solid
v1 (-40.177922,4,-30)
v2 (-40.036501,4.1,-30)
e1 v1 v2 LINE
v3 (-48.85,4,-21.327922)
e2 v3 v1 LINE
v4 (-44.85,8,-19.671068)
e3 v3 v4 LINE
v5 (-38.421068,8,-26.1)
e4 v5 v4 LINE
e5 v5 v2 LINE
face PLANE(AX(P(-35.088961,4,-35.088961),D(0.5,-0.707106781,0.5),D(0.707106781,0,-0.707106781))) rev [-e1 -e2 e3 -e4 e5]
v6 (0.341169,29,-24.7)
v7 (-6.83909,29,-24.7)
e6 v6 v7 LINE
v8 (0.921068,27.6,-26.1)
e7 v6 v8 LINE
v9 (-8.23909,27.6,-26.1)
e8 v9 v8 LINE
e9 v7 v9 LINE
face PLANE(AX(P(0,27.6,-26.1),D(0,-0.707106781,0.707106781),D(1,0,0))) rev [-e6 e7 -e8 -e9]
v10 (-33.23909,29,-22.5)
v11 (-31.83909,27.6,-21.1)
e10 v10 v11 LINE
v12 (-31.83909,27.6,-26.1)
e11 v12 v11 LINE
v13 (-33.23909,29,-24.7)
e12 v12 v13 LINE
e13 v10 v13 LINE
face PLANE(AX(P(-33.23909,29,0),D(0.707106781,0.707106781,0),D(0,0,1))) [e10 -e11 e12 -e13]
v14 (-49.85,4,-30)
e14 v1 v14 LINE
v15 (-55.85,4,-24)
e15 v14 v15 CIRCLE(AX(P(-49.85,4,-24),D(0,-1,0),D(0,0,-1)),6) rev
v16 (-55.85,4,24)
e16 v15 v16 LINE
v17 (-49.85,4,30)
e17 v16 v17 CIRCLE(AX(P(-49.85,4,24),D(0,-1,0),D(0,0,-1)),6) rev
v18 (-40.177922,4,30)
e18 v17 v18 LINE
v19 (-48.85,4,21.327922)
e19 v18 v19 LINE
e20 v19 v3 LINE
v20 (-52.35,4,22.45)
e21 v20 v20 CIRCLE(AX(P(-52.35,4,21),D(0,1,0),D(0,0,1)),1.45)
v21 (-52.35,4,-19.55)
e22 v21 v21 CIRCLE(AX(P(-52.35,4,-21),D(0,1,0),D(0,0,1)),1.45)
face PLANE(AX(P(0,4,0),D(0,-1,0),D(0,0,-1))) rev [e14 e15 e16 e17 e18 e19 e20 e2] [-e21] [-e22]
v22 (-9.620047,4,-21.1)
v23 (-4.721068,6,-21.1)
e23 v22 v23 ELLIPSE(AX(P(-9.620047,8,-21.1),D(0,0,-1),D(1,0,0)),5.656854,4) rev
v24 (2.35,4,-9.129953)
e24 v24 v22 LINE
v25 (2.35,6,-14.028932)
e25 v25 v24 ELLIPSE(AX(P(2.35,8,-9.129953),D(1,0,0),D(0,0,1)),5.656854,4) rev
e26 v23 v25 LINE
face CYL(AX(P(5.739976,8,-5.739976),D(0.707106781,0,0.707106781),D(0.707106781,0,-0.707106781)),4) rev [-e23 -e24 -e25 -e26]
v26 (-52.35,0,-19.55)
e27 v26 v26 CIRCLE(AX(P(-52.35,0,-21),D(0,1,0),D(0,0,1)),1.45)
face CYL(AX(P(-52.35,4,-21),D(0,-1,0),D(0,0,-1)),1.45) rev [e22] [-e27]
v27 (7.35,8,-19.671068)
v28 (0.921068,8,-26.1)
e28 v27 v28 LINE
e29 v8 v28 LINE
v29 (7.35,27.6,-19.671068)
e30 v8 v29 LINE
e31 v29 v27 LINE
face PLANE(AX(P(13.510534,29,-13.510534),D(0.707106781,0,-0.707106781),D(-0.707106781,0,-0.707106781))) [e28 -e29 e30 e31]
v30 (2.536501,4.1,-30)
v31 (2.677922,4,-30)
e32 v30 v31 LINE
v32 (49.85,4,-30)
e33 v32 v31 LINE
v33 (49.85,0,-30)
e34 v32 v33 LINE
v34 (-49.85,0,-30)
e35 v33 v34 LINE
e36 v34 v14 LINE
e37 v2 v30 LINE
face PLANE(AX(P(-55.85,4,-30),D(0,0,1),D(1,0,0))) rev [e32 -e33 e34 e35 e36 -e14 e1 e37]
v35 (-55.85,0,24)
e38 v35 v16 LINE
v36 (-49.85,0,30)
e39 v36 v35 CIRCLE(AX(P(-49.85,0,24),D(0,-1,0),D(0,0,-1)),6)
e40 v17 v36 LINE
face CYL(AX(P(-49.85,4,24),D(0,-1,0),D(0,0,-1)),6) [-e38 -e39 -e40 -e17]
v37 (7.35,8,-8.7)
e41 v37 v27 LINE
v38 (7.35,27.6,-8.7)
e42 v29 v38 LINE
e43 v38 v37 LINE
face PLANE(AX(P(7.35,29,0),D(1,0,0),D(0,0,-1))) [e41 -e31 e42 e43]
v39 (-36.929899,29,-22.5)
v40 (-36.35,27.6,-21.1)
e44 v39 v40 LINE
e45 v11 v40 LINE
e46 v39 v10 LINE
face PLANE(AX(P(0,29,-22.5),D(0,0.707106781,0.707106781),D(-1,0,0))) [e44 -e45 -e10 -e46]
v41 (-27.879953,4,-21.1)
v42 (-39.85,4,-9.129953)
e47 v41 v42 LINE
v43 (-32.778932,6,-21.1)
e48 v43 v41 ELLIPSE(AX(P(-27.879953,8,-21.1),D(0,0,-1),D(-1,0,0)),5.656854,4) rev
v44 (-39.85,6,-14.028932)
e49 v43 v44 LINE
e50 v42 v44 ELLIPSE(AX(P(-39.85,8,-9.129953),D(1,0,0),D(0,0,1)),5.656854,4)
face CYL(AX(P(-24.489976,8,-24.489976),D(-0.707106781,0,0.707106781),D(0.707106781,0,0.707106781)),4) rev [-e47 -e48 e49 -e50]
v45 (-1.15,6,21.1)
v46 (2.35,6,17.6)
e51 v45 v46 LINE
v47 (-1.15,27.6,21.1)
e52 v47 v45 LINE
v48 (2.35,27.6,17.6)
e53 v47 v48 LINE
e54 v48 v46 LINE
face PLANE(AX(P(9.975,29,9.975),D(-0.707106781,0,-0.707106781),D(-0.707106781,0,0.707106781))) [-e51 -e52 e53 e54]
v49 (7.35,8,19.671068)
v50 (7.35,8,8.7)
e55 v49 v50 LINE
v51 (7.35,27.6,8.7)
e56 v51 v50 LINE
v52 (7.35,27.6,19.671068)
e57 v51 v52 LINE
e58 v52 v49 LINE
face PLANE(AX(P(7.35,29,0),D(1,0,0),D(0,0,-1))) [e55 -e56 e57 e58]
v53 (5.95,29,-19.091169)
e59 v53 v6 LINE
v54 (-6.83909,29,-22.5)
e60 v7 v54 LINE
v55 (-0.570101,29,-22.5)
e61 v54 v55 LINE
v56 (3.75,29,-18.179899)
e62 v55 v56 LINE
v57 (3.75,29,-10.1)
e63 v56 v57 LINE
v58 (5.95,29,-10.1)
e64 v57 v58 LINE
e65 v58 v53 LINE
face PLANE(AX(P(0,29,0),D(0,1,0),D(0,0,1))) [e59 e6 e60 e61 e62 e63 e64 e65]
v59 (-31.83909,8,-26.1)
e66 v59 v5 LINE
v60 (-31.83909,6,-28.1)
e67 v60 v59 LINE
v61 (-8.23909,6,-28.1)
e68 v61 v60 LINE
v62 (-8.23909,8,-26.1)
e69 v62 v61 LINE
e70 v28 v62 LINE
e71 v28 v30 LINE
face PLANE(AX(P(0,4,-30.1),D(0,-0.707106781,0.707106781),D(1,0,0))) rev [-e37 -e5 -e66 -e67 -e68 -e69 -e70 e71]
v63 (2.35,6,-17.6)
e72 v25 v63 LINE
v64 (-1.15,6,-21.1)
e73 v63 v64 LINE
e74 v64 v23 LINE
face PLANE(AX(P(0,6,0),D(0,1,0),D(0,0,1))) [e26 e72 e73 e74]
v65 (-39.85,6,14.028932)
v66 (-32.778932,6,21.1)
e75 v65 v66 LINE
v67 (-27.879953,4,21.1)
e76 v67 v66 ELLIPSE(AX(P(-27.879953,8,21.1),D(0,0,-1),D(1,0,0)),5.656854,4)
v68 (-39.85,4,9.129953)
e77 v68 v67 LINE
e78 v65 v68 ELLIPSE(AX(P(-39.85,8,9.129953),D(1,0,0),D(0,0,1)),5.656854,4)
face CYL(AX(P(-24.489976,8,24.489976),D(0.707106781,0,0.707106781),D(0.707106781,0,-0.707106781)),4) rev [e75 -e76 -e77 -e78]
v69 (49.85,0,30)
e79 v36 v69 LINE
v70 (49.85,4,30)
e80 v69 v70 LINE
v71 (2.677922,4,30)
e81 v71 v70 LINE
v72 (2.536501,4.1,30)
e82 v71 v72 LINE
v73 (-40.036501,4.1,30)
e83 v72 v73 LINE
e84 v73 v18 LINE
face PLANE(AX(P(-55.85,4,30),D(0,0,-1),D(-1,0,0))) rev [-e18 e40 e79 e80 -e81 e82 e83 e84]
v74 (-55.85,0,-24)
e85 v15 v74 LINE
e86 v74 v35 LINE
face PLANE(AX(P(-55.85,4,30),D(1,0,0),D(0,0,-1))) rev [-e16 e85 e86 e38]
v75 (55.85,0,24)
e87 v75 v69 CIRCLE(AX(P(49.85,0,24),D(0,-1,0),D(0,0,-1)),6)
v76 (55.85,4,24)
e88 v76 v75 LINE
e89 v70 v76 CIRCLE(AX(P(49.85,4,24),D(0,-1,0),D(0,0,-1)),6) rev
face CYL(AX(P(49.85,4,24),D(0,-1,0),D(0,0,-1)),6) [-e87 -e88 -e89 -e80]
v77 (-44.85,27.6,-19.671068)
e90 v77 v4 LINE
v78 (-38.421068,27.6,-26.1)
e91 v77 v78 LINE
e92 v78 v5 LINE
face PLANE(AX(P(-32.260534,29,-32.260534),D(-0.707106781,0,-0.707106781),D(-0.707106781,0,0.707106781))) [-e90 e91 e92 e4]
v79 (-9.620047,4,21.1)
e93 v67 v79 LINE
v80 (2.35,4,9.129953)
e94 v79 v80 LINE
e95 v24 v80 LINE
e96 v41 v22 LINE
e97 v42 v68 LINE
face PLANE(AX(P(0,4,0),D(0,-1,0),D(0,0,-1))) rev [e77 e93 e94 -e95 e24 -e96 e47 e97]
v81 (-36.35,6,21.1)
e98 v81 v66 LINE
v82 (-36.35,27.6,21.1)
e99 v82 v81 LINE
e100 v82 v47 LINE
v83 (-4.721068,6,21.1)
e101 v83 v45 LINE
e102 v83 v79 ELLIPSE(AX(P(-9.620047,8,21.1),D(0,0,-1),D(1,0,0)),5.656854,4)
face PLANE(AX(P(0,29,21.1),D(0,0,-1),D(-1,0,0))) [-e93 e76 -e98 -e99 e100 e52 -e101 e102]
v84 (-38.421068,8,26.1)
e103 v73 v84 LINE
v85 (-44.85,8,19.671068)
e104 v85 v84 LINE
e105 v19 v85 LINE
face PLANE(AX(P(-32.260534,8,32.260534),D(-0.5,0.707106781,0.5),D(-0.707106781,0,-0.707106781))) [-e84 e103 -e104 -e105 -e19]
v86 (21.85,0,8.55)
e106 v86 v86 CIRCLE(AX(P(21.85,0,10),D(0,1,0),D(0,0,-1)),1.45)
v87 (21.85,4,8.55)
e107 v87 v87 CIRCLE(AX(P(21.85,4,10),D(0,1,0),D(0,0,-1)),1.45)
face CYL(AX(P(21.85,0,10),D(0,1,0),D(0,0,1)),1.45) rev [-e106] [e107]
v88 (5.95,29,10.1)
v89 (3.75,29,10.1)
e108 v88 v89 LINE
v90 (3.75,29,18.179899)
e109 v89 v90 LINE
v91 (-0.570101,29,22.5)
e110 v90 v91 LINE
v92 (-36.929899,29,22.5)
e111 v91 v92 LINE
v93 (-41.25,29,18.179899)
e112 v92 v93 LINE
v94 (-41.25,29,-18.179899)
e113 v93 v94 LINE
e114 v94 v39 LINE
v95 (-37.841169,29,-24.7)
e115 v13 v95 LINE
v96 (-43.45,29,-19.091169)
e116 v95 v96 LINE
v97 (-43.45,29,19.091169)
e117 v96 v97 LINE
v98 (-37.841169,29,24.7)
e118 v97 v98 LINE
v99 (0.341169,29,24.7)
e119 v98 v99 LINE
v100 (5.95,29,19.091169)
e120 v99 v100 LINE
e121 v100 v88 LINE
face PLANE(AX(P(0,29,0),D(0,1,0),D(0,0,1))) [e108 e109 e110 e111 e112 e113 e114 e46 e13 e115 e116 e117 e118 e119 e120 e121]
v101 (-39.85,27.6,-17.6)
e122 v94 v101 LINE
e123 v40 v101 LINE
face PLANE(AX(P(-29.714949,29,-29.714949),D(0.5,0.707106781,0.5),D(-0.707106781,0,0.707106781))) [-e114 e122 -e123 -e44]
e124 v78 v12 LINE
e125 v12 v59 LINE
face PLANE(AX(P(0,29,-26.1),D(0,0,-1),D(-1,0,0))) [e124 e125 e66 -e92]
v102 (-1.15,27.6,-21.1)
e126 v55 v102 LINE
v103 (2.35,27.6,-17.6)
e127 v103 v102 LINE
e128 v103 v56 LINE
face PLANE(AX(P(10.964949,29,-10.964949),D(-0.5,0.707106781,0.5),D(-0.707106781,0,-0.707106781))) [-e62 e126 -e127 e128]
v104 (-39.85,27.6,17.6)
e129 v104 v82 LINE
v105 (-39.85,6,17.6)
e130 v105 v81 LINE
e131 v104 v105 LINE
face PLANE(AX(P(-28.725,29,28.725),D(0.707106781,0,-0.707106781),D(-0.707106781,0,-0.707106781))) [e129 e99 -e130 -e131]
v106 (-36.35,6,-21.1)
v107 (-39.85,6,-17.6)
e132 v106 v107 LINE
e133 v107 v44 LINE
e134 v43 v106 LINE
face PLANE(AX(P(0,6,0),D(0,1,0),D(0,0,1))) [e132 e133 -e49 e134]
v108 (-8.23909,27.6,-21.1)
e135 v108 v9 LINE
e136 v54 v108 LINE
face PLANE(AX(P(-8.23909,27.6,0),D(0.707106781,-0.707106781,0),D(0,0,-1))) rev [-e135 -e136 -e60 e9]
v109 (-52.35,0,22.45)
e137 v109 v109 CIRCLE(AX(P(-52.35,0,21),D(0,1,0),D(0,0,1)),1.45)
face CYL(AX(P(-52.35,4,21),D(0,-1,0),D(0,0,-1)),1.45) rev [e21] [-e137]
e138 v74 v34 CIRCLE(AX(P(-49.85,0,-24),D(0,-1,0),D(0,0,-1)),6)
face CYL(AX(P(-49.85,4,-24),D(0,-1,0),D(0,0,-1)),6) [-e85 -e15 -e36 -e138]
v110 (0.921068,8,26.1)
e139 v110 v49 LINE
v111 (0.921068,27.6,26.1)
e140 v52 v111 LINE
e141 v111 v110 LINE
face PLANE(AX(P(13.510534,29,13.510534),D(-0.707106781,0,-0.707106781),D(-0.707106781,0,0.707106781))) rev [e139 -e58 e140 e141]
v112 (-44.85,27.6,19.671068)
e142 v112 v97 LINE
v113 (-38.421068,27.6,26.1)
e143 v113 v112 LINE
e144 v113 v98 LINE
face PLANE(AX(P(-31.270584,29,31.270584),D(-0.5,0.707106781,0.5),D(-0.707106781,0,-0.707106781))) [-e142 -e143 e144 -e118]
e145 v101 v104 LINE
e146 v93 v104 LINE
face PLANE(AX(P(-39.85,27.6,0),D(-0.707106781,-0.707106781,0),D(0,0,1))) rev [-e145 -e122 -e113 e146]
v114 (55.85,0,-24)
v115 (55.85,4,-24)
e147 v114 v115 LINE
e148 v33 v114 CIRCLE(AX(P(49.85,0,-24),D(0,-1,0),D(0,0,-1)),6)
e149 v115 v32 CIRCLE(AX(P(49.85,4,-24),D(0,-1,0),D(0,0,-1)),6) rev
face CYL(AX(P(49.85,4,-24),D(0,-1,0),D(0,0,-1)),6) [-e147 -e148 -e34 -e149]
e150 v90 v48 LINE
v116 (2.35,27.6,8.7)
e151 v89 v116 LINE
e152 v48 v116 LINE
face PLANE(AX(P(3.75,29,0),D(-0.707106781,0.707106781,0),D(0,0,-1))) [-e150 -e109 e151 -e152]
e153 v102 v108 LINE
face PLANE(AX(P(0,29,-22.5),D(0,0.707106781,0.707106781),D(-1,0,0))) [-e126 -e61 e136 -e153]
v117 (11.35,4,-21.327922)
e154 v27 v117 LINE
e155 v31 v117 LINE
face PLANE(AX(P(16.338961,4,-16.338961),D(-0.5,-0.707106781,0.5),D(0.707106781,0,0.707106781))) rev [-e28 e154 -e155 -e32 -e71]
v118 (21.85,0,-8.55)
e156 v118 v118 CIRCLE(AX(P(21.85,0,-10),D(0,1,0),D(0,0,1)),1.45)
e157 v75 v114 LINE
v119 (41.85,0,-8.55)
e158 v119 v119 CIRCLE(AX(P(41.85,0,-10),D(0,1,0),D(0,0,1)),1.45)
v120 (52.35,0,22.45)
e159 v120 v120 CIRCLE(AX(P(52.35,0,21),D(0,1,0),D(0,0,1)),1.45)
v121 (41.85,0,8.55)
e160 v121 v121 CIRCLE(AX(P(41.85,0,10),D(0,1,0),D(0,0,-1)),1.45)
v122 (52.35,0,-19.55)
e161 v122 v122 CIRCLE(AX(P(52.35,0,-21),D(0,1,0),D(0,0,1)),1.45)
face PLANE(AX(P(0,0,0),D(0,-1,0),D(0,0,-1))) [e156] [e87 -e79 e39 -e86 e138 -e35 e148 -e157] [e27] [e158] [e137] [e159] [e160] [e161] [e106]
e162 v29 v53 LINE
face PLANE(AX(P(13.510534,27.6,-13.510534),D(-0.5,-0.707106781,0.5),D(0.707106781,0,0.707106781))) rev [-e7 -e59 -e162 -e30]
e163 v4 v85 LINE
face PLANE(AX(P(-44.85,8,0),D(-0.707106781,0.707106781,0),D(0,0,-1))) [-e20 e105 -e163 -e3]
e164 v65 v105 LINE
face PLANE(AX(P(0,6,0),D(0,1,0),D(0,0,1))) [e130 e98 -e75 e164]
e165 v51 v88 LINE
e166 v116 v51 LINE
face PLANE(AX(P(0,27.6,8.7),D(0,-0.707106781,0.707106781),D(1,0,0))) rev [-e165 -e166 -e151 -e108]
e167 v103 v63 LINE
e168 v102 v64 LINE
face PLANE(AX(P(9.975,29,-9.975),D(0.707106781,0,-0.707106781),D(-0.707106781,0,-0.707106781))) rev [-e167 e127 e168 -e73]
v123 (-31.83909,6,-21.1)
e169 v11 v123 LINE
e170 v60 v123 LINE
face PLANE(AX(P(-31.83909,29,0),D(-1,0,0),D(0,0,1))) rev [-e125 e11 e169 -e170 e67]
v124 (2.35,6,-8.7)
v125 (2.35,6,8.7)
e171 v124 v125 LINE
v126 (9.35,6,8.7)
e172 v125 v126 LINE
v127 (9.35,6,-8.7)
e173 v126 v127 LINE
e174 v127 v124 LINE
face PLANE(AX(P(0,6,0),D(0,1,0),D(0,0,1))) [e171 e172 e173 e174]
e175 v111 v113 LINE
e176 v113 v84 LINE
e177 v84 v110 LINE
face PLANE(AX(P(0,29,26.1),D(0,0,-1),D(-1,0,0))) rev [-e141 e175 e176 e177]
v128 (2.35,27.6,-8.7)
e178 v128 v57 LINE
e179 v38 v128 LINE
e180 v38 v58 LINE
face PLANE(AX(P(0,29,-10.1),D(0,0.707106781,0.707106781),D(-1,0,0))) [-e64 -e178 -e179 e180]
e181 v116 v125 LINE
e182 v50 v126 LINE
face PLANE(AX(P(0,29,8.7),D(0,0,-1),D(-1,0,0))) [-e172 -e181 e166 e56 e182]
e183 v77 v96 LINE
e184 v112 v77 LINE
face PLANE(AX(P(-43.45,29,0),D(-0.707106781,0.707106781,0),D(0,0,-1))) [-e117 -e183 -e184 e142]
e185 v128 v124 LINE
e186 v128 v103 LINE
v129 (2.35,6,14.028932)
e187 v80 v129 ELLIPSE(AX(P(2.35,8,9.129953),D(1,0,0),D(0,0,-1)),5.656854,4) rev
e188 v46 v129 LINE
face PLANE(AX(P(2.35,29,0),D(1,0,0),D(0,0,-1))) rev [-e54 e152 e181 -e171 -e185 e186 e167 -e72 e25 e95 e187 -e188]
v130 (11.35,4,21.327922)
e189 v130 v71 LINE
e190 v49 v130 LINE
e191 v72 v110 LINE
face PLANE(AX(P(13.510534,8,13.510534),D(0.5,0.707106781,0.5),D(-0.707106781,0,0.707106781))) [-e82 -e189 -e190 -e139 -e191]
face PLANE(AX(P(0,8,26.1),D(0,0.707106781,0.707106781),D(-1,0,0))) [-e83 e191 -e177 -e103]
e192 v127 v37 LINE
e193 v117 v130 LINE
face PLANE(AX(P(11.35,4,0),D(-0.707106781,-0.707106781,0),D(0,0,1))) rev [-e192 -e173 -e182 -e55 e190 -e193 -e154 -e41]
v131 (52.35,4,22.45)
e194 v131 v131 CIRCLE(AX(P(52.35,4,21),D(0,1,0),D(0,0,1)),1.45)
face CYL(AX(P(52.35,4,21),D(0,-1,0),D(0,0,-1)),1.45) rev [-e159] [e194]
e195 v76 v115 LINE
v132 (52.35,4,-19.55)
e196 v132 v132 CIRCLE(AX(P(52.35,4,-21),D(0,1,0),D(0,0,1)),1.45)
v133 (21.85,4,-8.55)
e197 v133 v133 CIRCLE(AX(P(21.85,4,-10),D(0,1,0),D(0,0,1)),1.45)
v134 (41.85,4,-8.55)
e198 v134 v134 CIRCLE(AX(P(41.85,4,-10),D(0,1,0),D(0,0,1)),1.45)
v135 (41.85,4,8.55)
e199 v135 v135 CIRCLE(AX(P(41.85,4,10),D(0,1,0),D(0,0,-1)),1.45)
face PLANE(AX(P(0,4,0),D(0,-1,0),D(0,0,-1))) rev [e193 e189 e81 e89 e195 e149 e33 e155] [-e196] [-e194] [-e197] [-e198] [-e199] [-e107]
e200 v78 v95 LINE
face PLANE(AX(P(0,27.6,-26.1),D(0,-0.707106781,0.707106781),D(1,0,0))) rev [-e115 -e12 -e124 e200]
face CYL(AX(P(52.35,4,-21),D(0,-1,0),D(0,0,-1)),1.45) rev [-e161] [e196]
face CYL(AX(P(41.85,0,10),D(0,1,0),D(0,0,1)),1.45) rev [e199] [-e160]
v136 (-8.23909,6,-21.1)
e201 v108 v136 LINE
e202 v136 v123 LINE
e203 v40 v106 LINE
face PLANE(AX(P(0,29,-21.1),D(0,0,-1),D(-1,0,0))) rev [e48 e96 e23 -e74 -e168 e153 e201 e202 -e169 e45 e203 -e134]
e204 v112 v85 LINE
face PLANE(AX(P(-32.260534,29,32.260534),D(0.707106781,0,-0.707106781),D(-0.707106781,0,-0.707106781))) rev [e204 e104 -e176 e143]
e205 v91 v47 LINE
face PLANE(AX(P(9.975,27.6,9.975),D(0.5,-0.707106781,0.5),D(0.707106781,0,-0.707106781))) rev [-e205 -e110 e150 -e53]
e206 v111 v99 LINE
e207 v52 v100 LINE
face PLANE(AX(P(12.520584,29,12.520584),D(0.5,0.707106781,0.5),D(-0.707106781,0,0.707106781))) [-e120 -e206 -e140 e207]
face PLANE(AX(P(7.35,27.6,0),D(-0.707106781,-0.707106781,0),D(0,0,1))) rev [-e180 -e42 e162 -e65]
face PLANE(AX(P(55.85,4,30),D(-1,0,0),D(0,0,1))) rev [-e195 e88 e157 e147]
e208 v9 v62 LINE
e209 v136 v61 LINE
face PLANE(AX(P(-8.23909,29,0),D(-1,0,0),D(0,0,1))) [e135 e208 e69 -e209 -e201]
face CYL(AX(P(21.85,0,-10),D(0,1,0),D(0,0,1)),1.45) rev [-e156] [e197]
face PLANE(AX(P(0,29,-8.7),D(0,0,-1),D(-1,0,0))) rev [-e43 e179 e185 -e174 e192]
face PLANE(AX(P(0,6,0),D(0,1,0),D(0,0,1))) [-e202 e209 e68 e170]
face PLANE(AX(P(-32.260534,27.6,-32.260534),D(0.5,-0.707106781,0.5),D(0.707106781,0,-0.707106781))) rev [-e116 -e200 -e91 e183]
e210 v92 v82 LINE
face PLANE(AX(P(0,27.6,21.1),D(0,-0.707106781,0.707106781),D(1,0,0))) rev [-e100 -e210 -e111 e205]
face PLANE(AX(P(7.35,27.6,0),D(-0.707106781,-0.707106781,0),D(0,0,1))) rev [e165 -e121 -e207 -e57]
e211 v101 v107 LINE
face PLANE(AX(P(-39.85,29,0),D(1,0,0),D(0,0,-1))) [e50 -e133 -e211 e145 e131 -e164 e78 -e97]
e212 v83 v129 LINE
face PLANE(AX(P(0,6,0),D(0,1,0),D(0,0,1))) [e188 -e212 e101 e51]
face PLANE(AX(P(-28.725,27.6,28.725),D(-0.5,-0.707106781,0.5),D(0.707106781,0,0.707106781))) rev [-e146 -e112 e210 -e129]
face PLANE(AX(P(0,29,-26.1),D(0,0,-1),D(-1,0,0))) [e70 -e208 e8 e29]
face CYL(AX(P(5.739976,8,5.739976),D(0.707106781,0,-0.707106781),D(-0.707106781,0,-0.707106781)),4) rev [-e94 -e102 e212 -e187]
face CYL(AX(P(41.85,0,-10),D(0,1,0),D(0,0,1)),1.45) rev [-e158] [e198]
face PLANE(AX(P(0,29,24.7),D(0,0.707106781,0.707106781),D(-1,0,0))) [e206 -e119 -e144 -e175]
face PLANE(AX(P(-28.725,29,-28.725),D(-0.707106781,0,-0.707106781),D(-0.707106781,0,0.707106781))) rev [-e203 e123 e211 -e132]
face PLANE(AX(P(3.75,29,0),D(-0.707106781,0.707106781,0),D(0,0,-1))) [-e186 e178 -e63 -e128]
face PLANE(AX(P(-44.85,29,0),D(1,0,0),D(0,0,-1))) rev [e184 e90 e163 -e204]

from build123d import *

# Parameters (mm, degrees)
SKETCH_1_W          = 111.7
SKETCH_1_H          = 60
SKETCH_1_R          = 1.45
EXTRUDE_1_DEPTH     = 4
EXTRUDE_2_DEPTH     = 25
SKETCH_4_W          = 23.6
SKETCH_4_H          = 5
SKETCH_4_W_2        = 5
SKETCH_4_H_2        = 17.4
EXTRUDE_3_DEPTH     = 2
CHAMFER_1_SIZE      = 4
FILLET_1_R          = 6
SKETCH_5_R          = 1.45
CUT_EXTRUDE_1_DEPTH = 69.148532633
CHAMFER_2_SIZE      = 1.4
FILLET_2_R          = 4


with BuildPart() as part:
    # 草图1 → 凸台-拉伸1 (new body)
    with BuildSketch(Plane(origin=(0, 0, 0), x_dir=(1, 0, 0), z_dir=(0, 1, 0))):
        Rectangle(SKETCH_1_W, SKETCH_1_H)
        with Locations(Location((-52.35, 21, 0), (0, 0, 270))):
            Circle(SKETCH_1_R, mode=Mode.SUBTRACT)
        with Locations(Location((52.35, 21, 0), (0, 0, 270))):
            Circle(SKETCH_1_R, mode=Mode.SUBTRACT)
        with Locations(Location((52.35, -21, 0), (0, 0, 270))):
            Circle(SKETCH_1_R, mode=Mode.SUBTRACT)
        with Locations(Location((-52.35, -21, 0), (0, 0, 270))):
            Circle(SKETCH_1_R, mode=Mode.SUBTRACT)
    extrude(amount=EXTRUDE_1_DEPTH)

    # 草图3 → 凸台-拉伸2 (add)
    with BuildSketch(Plane(origin=(0, 4, 0), x_dir=(1, 0, 0), z_dir=(0, 1, 0))):
        Polygon((-36.35, 21.1), (-31.839090409, 21.1), (-31.839090409, 26.1), (-38.421067812, 26.1), (-44.85, 19.671067812), (-44.85, -19.671067812), (-38.421067812, -26.1), (0.921067812, -26.1), (7.35, -19.671067812), (7.35, -8.7), (2.35, -8.7), (2.35, -17.6), (-1.15, -21.1), (-36.35, -21.1), (-39.85, -17.6), (-39.85, 17.6), align=None)
        Polygon((-8.239090409, 21.1), (-1.15, 21.1), (2.35, 17.6), (2.35, 8.7), (7.35, 8.7), (7.35, 19.671067812), (0.921067812, 26.1), (-8.239090409, 26.1), align=None)
    extrude(amount=EXTRUDE_2_DEPTH)

    # 草图4 → 凸台-拉伸3 (add)
    with BuildSketch(Plane(origin=(0, 4, 0), x_dir=(1, 0, 0), z_dir=(0, 1, 0))):
        with Locations((-20.039090409, 23.6)):
            Rectangle(SKETCH_4_W, SKETCH_4_H)
        with Locations((4.85, 0)):
            Rectangle(SKETCH_4_W_2, SKETCH_4_H_2)
        Polygon((-39.85, 17.6), (-39.85, 14.028932188), (-32.778932188, 21.1), (-36.35, 21.1), align=None)
        Polygon((-4.721067812, 21.1), (2.35, 14.028932188), (2.35, 17.6), (-1.15, 21.1), align=None)
        Polygon((2.35, -17.6), (2.35, -14.028932188), (-4.721067812, -21.1), (-1.15, -21.1), align=None)
        Polygon((-36.35, -21.1), (-32.778932188, -21.1), (-39.85, -14.028932188), (-39.85, -17.6), align=None)
    extrude(amount=EXTRUDE_3_DEPTH)

    # 倒角1
    # the kernel refuses this chamfer: 4 mm, written as the material it adds along each edge
    with BuildSketch(Plane(origin=(-31.147249892, 4, -33.373817919), x_dir=(-0.7071067811865474, 0, -0.7071067811865478), z_dir=(-0.7071067811865478, 0, 0.7071067811865474))) as chamfer_1_piece_1_section:
        Polygon((CHAMFER_1_SIZE, 0), (0, -CHAMFER_1_SIZE), (0, 0), align=None)
    chamfer_1_piece_1 = extrude(amount=29.665346996, mode=Mode.PRIVATE)
    chamfer_1_piece_1 = split(chamfer_1_piece_1, bisect_by=Plane(origin=(-31.147249892, 4, -30), z_dir=(0, 0, 1)), keep=Keep.TOP, mode=Mode.PRIVATE)
    chamfer_1_piece_1 = split(chamfer_1_piece_1, bisect_by=Plane(origin=(-39.998624946, 12.851375054, -33.373817919), z_dir=(0.7071067811865476, -0.7071067811865476, 0)), keep=Keep.TOP, mode=Mode.PRIVATE)
    chamfer_1_piece_1 = split(chamfer_1_piece_1, bisect_by=Plane(origin=(-31.147249892, 2.36309104, -31.73690896), z_dir=(0, -0.7071067811865476, 0.7071067811865476)), keep=Keep.TOP, mode=Mode.PRIVATE)
    add(chamfer_1_piece_1)
    with BuildSketch(Plane(origin=(-48.707799764, 4, -26.1), x_dir=(0, 0, -1), z_dir=(1, 0, 0))) as chamfer_1_piece_2_section:
        Polygon((CHAMFER_1_SIZE, 0), (0, CHAMFER_1_SIZE), (0, 0), align=None)
    chamfer_1_piece_2 = extrude(amount=59.915599527, mode=Mode.PRIVATE)
    chamfer_1_piece_2 = split(chamfer_1_piece_2, bisect_by=Plane(origin=(-48.707799764, 6, -26.1), z_dir=(0, -1, 0)), keep=Keep.TOP, mode=Mode.PRIVATE)
    chamfer_1_piece_2 = split(chamfer_1_piece_2, bisect_by=Plane(origin=(-48.707799764, 4, -30), z_dir=(0, 0, 1)), keep=Keep.TOP, mode=Mode.PRIVATE)
    chamfer_1_piece_2 = split(chamfer_1_piece_2, bisect_by=Plane(origin=(-34.886369307, 23.546454403, -39.921430456), z_dir=(-0.4999999999999999, -0.7071067811865478, 0.49999999999999967)), keep=Keep.TOP, mode=Mode.PRIVATE)
    chamfer_1_piece_2 = split(chamfer_1_piece_2, bisect_by=Plane(origin=(-47.550330338, 2.36309104, -24.942530574), z_dir=(0.4999999999999996, -0.7071067811865479, 0.4999999999999999)), keep=Keep.TOP, mode=Mode.PRIVATE)
    add(chamfer_1_piece_2)
    with BuildSketch(Plane(origin=(-48.707799764, 4, -26.1), x_dir=(0, 0, -1), z_dir=(1, 0, 0))) as chamfer_1_piece_3_section:
        Polygon((CHAMFER_1_SIZE, 0), (0, CHAMFER_1_SIZE), (0, 0), align=None)
    chamfer_1_piece_3 = extrude(amount=59.915599527, mode=Mode.PRIVATE)
    chamfer_1_piece_3 = split(chamfer_1_piece_3, bisect_by=Plane(origin=(-31.839090409, 4, -26.1), z_dir=(-1, 0, 0)), keep=Keep.TOP, mode=Mode.PRIVATE)
    chamfer_1_piece_3 = split(chamfer_1_piece_3, bisect_by=Plane(origin=(-48.707799764, 4, -30), z_dir=(0, 0, 1)), keep=Keep.TOP, mode=Mode.PRIVATE)
    chamfer_1_piece_3 = split(chamfer_1_piece_3, bisect_by=Plane(origin=(-47.550330338, 2.36309104, -24.942530574), z_dir=(0.4999999999999996, -0.7071067811865479, 0.4999999999999999)), keep=Keep.TOP, mode=Mode.PRIVATE)
    add(chamfer_1_piece_3)
    with BuildSketch(Plane(origin=(-48.707799764, 4, -26.1), x_dir=(0, 0, -1), z_dir=(1, 0, 0))) as chamfer_1_piece_4_section:
        Polygon((CHAMFER_1_SIZE, 0), (0, CHAMFER_1_SIZE), (0, 0), align=None)
    chamfer_1_piece_4 = extrude(amount=59.915599527, mode=Mode.PRIVATE)
    chamfer_1_piece_4 = split(chamfer_1_piece_4, bisect_by=Plane(origin=(-8.239090409, 4, -26.1), z_dir=(1, 0, 0)), keep=Keep.TOP, mode=Mode.PRIVATE)
    chamfer_1_piece_4 = split(chamfer_1_piece_4, bisect_by=Plane(origin=(-48.707799764, 4, -30), z_dir=(0, 0, 1)), keep=Keep.TOP, mode=Mode.PRIVATE)
    chamfer_1_piece_4 = split(chamfer_1_piece_4, bisect_by=Plane(origin=(-34.886369307, 23.546454403, -39.921430456), z_dir=(-0.4999999999999999, -0.7071067811865478, 0.49999999999999967)), keep=Keep.TOP, mode=Mode.PRIVATE)
    add(chamfer_1_piece_4)
    with BuildSketch(Plane(origin=(14.623817919, 4, -12.397249892), x_dir=(0.7071067811865477, 0, -0.7071067811865475), z_dir=(-0.7071067811865475, 0, -0.7071067811865477))) as chamfer_1_piece_5_section:
        Polygon((CHAMFER_1_SIZE, 0), (0, -CHAMFER_1_SIZE), (0, 0), align=None)
    chamfer_1_piece_5 = extrude(amount=29.665346996, mode=Mode.PRIVATE)
    chamfer_1_piece_5 = split(chamfer_1_piece_5, bisect_by=Plane(origin=(14.623817919, 4, -30), z_dir=(0, 0, 1)), keep=Keep.TOP, mode=Mode.PRIVATE)
    chamfer_1_piece_5 = split(chamfer_1_piece_5, bisect_by=Plane(origin=(12.98690896, 2.36309104, -12.397249892), z_dir=(-0.7071067811865476, -0.7071067811865476, 0)), keep=Keep.TOP, mode=Mode.PRIVATE)
    chamfer_1_piece_5 = split(chamfer_1_piece_5, bisect_by=Plane(origin=(14.623817919, 12.851375054, -21.248624946), z_dir=(0, -0.7071067811865476, 0.7071067811865476)), keep=Keep.TOP, mode=Mode.PRIVATE)
    add(chamfer_1_piece_5)
    with BuildSketch(Plane(origin=(-44.85, 4, -29.957799764), x_dir=(-1, 0, 0), z_dir=(0, 0, 1))) as chamfer_1_piece_6_section:
        Polygon((CHAMFER_1_SIZE, 0), (0, -CHAMFER_1_SIZE), (0, 0), align=None)
    chamfer_1_piece_6 = extrude(amount=59.915599527, mode=Mode.PRIVATE)
    chamfer_1_piece_6 = split(chamfer_1_piece_6, bisect_by=Plane(origin=(-58.671430456, 23.546454403, -16.136369307), z_dir=(0.5000000000000001, -0.7071067811865477, -0.5000000000000001)), keep=Keep.TOP, mode=Mode.PRIVATE)
    chamfer_1_piece_6 = split(chamfer_1_piece_6, bisect_by=Plane(origin=(-43.692530574, 2.36309104, -28.800330338), z_dir=(0.4999999999999996, -0.7071067811865479, 0.4999999999999999)), keep=Keep.TOP, mode=Mode.PRIVATE)
    add(chamfer_1_piece_6)
    with BuildSketch(Plane(origin=(-52.123817919, 4, 12.397249892), x_dir=(-0.7071067811865476, 0, 0.7071067811865476), z_dir=(0.7071067811865476, 0, 0.7071067811865476))) as chamfer_1_piece_7_section:
        Polygon((CHAMFER_1_SIZE, 0), (0, -CHAMFER_1_SIZE), (0, 0), align=None)
    chamfer_1_piece_7 = extrude(amount=29.665346996, mode=Mode.PRIVATE)
    chamfer_1_piece_7 = split(chamfer_1_piece_7, bisect_by=Plane(origin=(-52.123817919, 4, 30), z_dir=(0, 0, -1)), keep=Keep.TOP, mode=Mode.PRIVATE)
    chamfer_1_piece_7 = split(chamfer_1_piece_7, bisect_by=Plane(origin=(-52.123817919, 12.851375054, 21.248624946), z_dir=(0, -0.7071067811865472, -0.7071067811865479)), keep=Keep.TOP, mode=Mode.PRIVATE)
    chamfer_1_piece_7 = split(chamfer_1_piece_7, bisect_by=Plane(origin=(-50.48690896, 2.36309104, 12.397249892), z_dir=(0.7071067811865476, -0.7071067811865476, 0)), keep=Keep.TOP, mode=Mode.PRIVATE)
    add(chamfer_1_piece_7)
    with BuildSketch(Plane(origin=(7.35, 4, -29.957799764), x_dir=(1, 0, 0), z_dir=(0, 0, 1))) as chamfer_1_piece_8_section:
        Polygon((CHAMFER_1_SIZE, 0), (0, CHAMFER_1_SIZE), (0, 0), align=None)
    chamfer_1_piece_8 = extrude(amount=59.915599527, mode=Mode.PRIVATE)
    chamfer_1_piece_8 = split(chamfer_1_piece_8, bisect_by=Plane(origin=(7.35, 6, -29.957799764), z_dir=(0, -1, 0)), keep=Keep.TOP, mode=Mode.PRIVATE)
    chamfer_1_piece_8 = split(chamfer_1_piece_8, bisect_by=Plane(origin=(6.192530574, 2.36309104, -28.800330338), z_dir=(-0.4999999999999999, -0.7071067811865478, 0.49999999999999967)), keep=Keep.TOP, mode=Mode.PRIVATE)
    chamfer_1_piece_8 = split(chamfer_1_piece_8, bisect_by=Plane(origin=(21.171430456, 23.546454403, -16.136369307), z_dir=(-0.5000000000000004, -0.7071067811865477, -0.4999999999999993)), keep=Keep.TOP, mode=Mode.PRIVATE)
    add(chamfer_1_piece_8)
    with BuildSketch(Plane(origin=(7.35, 4, -29.957799764), x_dir=(1, 0, 0), z_dir=(0, 0, 1))) as chamfer_1_piece_9_section:
        Polygon((CHAMFER_1_SIZE, 0), (0, CHAMFER_1_SIZE), (0, 0), align=None)
    chamfer_1_piece_9 = extrude(amount=59.915599527, mode=Mode.PRIVATE)
    chamfer_1_piece_9 = split(chamfer_1_piece_9, bisect_by=Plane(origin=(7.35, 4, -8.7), z_dir=(0, 0, -1)), keep=Keep.TOP, mode=Mode.PRIVATE)
    chamfer_1_piece_9 = split(chamfer_1_piece_9, bisect_by=Plane(origin=(6.192530574, 2.36309104, -28.800330338), z_dir=(-0.4999999999999999, -0.7071067811865478, 0.49999999999999967)), keep=Keep.TOP, mode=Mode.PRIVATE)
    add(chamfer_1_piece_9)
    with BuildSketch(Plane(origin=(7.35, 4, -29.957799764), x_dir=(1, 0, 0), z_dir=(0, 0, 1))) as chamfer_1_piece_10_section:
        Polygon((CHAMFER_1_SIZE, 0), (0, CHAMFER_1_SIZE), (0, 0), align=None)
    chamfer_1_piece_10 = extrude(amount=59.915599527, mode=Mode.PRIVATE)
    chamfer_1_piece_10 = split(chamfer_1_piece_10, bisect_by=Plane(origin=(7.35, 4, 8.7), z_dir=(0, 0, 1)), keep=Keep.TOP, mode=Mode.PRIVATE)
    chamfer_1_piece_10 = split(chamfer_1_piece_10, bisect_by=Plane(origin=(21.171430456, 23.546454403, -16.136369307), z_dir=(-0.5000000000000004, -0.7071067811865477, -0.4999999999999993)), keep=Keep.TOP, mode=Mode.PRIVATE)
    add(chamfer_1_piece_10)
    with BuildSketch(Plane(origin=(-6.352750108, 4, 33.373817919), x_dir=(0.7071067811865483, 0, 0.7071067811865468), z_dir=(0.7071067811865467, 0, -0.7071067811865483))) as chamfer_1_piece_11_section:
        Polygon((CHAMFER_1_SIZE, 0), (0, -CHAMFER_1_SIZE), (0, 0), align=None)
    chamfer_1_piece_11 = extrude(amount=29.665346996, mode=Mode.PRIVATE)
    chamfer_1_piece_11 = split(chamfer_1_piece_11, bisect_by=Plane(origin=(-6.352750108, 4, 30), z_dir=(0, 0, -1)), keep=Keep.TOP, mode=Mode.PRIVATE)
    chamfer_1_piece_11 = split(chamfer_1_piece_11, bisect_by=Plane(origin=(2.498624946, 12.851375054, 33.373817919), z_dir=(-0.7071067811865476, -0.7071067811865476, 0)), keep=Keep.TOP, mode=Mode.PRIVATE)
    chamfer_1_piece_11 = split(chamfer_1_piece_11, bisect_by=Plane(origin=(-6.352750108, 2.36309104, 31.73690896), z_dir=(0, -0.7071067811865472, -0.7071067811865479)), keep=Keep.TOP, mode=Mode.PRIVATE)
    add(chamfer_1_piece_11)
    with BuildSketch(Plane(origin=(-48.707799764, 4, 26.1), x_dir=(0, 0, 1), z_dir=(1, 0, 0))) as chamfer_1_piece_12_section:
        Polygon((CHAMFER_1_SIZE, 0), (0, -CHAMFER_1_SIZE), (0, 0), align=None)
    chamfer_1_piece_12 = extrude(amount=59.915599527, mode=Mode.PRIVATE)
    chamfer_1_piece_12 = split(chamfer_1_piece_12, bisect_by=Plane(origin=(-48.707799764, 4, 30), z_dir=(0, 0, -1)), keep=Keep.TOP, mode=Mode.PRIVATE)
    chamfer_1_piece_12 = split(chamfer_1_piece_12, bisect_by=Plane(origin=(-34.886369307, 23.546454403, 39.921430456), z_dir=(-0.5000000000000004, -0.7071067811865477, -0.4999999999999993)), keep=Keep.TOP, mode=Mode.PRIVATE)
    chamfer_1_piece_12 = split(chamfer_1_piece_12, bisect_by=Plane(origin=(-47.550330338, 2.36309104, 24.942530574), z_dir=(0.5000000000000001, -0.7071067811865477, -0.5000000000000001)), keep=Keep.TOP, mode=Mode.PRIVATE)
    add(chamfer_1_piece_12)

    # 圆角1
    fillet_1_edges = [part.edges().sort_by_distance(p)[0] for p in [
        (55.85, 2, 30),
        (-55.85, 2, 30),
        (-55.85, 2, -30),
        (55.85, 2, -30),
    ]]
    fillet(fillet_1_edges, radius=FILLET_1_R)

    # 草图5 → 切除-拉伸1 (cut, through all)
    with BuildSketch(Plane(origin=(0, 4, 0), x_dir=(1, 0, 0), z_dir=(0, 1, 0))):
        with Locations(Location((21.85, 10, 0), (0, 0, 270))):
            Circle(SKETCH_5_R)
        with Locations(Location((41.85, 10, 0), (0, 0, 270))):
            Circle(SKETCH_5_R)
        with Locations(Location((41.85, -10, 0), (0, 0, 90))):
            Circle(SKETCH_5_R)
        with Locations(Location((21.85, -10, 0), (0, 0, 90))):
            Circle(SKETCH_5_R)
    extrude(amount=-CUT_EXTRUDE_1_DEPTH, mode=Mode.SUBTRACT)

    # 倒角2
    chamfer_2_edges = [part.edges().sort_by_distance(p)[0] for p in [
        (4.85, 29, 8.7),
        (0.6, 29, 19.35),
        (-18.75, 29, 21.1),
        (-38.1, 29, 19.35),
        (-39.85, 29, 0),
        (-35.130079111, 29, -26.1),
        (-41.635533906, 29, -22.885533906),
        (7.35, 29, 14.185533906),
        (2.35, 29, 13.15),
        (-38.1, 29, -19.35),
        (-34.094545205, 29, -21.1),
        (-31.839090409, 29, -23.6),
        (-44.85, 29, 0),
        (-41.635533906, 29, 22.885533906),
        (-18.75, 29, 26.1),
        (4.135533906, 29, 22.885533906),
        (7.35, 29, -14.185533906),
        (4.135533906, 29, -22.885533906),
        (-3.659011299, 29, -26.1),
        (-8.239090409, 29, -23.6),
        (2.35, 29, -13.15),
        (4.85, 29, -8.7),
        (-4.694545205, 29, -21.1),
        (0.6, 29, -19.35),
    ]]
    chamfer(chamfer_2_edges, length=CHAMFER_2_SIZE)

    # 圆角2
    # the kernel refuses this fillet: 4 mm, written as the material it adds along each edge
    with BuildSketch(Plane(origin=(-26.655207831, 4, 27.223724357), x_dir=(0.7071067811865476, 0, -0.7071067811865476), z_dir=(-0.7071067811865476, 0, -0.7071067811865476)), Plane(origin=(-45.973724357, 4, -7.905207831), x_dir=(0.7071067811865481, 0, 0.707106781186547), z_dir=(0.707106781186547, 0, -0.707106781186548)), Plane(origin=(-10.844792169, 4, -27.223724357), x_dir=(-0.7071067811865477, 0, 0.7071067811865475), z_dir=(0.7071067811865475, 0, 0.7071067811865476))) as fillet_2_piece_1:
        with BuildLine():
            CenterArc((3.464101615, -4), FILLET_2_R, 90, 60)
            Line((0, -2), (-0.069282032, -1.96))
            ThreePointArc((-0.069282032, -1.96), (-0.08, -1), (-0.08, 0))
            Line((-0.08, 0), (0, 0.08))
            Line((0, 0.08), (3.464101615, 0.08))
            Line((3.464101615, 0.08), (3.464101615, 0))
        make_face()
    extrude(amount=27.320508076)
    with BuildSketch(Plane(origin=(8.473724357, 4, 7.905207831), x_dir=(0, 1, 0), z_dir=(-0.7071067811865462, 0, 0.7071067811865488))) as fillet_2_piece_2:
        with BuildLine():
            CenterArc((4, 3.464101615), FILLET_2_R, 180, 60)
            Line((0, 3.464101615), (-0.08, 3.464101615))
            Line((-0.08, 3.464101615), (-0.08, 0))
            Line((-0.08, 0), (0, -0.08))
            ThreePointArc((0, -0.08), (1, -0.08), (1.96, -0.069282032))
            Line((1.96, -0.069282032), (2, 0))
        make_face()
    extrude(amount=27.320508076)


solid = part.part
